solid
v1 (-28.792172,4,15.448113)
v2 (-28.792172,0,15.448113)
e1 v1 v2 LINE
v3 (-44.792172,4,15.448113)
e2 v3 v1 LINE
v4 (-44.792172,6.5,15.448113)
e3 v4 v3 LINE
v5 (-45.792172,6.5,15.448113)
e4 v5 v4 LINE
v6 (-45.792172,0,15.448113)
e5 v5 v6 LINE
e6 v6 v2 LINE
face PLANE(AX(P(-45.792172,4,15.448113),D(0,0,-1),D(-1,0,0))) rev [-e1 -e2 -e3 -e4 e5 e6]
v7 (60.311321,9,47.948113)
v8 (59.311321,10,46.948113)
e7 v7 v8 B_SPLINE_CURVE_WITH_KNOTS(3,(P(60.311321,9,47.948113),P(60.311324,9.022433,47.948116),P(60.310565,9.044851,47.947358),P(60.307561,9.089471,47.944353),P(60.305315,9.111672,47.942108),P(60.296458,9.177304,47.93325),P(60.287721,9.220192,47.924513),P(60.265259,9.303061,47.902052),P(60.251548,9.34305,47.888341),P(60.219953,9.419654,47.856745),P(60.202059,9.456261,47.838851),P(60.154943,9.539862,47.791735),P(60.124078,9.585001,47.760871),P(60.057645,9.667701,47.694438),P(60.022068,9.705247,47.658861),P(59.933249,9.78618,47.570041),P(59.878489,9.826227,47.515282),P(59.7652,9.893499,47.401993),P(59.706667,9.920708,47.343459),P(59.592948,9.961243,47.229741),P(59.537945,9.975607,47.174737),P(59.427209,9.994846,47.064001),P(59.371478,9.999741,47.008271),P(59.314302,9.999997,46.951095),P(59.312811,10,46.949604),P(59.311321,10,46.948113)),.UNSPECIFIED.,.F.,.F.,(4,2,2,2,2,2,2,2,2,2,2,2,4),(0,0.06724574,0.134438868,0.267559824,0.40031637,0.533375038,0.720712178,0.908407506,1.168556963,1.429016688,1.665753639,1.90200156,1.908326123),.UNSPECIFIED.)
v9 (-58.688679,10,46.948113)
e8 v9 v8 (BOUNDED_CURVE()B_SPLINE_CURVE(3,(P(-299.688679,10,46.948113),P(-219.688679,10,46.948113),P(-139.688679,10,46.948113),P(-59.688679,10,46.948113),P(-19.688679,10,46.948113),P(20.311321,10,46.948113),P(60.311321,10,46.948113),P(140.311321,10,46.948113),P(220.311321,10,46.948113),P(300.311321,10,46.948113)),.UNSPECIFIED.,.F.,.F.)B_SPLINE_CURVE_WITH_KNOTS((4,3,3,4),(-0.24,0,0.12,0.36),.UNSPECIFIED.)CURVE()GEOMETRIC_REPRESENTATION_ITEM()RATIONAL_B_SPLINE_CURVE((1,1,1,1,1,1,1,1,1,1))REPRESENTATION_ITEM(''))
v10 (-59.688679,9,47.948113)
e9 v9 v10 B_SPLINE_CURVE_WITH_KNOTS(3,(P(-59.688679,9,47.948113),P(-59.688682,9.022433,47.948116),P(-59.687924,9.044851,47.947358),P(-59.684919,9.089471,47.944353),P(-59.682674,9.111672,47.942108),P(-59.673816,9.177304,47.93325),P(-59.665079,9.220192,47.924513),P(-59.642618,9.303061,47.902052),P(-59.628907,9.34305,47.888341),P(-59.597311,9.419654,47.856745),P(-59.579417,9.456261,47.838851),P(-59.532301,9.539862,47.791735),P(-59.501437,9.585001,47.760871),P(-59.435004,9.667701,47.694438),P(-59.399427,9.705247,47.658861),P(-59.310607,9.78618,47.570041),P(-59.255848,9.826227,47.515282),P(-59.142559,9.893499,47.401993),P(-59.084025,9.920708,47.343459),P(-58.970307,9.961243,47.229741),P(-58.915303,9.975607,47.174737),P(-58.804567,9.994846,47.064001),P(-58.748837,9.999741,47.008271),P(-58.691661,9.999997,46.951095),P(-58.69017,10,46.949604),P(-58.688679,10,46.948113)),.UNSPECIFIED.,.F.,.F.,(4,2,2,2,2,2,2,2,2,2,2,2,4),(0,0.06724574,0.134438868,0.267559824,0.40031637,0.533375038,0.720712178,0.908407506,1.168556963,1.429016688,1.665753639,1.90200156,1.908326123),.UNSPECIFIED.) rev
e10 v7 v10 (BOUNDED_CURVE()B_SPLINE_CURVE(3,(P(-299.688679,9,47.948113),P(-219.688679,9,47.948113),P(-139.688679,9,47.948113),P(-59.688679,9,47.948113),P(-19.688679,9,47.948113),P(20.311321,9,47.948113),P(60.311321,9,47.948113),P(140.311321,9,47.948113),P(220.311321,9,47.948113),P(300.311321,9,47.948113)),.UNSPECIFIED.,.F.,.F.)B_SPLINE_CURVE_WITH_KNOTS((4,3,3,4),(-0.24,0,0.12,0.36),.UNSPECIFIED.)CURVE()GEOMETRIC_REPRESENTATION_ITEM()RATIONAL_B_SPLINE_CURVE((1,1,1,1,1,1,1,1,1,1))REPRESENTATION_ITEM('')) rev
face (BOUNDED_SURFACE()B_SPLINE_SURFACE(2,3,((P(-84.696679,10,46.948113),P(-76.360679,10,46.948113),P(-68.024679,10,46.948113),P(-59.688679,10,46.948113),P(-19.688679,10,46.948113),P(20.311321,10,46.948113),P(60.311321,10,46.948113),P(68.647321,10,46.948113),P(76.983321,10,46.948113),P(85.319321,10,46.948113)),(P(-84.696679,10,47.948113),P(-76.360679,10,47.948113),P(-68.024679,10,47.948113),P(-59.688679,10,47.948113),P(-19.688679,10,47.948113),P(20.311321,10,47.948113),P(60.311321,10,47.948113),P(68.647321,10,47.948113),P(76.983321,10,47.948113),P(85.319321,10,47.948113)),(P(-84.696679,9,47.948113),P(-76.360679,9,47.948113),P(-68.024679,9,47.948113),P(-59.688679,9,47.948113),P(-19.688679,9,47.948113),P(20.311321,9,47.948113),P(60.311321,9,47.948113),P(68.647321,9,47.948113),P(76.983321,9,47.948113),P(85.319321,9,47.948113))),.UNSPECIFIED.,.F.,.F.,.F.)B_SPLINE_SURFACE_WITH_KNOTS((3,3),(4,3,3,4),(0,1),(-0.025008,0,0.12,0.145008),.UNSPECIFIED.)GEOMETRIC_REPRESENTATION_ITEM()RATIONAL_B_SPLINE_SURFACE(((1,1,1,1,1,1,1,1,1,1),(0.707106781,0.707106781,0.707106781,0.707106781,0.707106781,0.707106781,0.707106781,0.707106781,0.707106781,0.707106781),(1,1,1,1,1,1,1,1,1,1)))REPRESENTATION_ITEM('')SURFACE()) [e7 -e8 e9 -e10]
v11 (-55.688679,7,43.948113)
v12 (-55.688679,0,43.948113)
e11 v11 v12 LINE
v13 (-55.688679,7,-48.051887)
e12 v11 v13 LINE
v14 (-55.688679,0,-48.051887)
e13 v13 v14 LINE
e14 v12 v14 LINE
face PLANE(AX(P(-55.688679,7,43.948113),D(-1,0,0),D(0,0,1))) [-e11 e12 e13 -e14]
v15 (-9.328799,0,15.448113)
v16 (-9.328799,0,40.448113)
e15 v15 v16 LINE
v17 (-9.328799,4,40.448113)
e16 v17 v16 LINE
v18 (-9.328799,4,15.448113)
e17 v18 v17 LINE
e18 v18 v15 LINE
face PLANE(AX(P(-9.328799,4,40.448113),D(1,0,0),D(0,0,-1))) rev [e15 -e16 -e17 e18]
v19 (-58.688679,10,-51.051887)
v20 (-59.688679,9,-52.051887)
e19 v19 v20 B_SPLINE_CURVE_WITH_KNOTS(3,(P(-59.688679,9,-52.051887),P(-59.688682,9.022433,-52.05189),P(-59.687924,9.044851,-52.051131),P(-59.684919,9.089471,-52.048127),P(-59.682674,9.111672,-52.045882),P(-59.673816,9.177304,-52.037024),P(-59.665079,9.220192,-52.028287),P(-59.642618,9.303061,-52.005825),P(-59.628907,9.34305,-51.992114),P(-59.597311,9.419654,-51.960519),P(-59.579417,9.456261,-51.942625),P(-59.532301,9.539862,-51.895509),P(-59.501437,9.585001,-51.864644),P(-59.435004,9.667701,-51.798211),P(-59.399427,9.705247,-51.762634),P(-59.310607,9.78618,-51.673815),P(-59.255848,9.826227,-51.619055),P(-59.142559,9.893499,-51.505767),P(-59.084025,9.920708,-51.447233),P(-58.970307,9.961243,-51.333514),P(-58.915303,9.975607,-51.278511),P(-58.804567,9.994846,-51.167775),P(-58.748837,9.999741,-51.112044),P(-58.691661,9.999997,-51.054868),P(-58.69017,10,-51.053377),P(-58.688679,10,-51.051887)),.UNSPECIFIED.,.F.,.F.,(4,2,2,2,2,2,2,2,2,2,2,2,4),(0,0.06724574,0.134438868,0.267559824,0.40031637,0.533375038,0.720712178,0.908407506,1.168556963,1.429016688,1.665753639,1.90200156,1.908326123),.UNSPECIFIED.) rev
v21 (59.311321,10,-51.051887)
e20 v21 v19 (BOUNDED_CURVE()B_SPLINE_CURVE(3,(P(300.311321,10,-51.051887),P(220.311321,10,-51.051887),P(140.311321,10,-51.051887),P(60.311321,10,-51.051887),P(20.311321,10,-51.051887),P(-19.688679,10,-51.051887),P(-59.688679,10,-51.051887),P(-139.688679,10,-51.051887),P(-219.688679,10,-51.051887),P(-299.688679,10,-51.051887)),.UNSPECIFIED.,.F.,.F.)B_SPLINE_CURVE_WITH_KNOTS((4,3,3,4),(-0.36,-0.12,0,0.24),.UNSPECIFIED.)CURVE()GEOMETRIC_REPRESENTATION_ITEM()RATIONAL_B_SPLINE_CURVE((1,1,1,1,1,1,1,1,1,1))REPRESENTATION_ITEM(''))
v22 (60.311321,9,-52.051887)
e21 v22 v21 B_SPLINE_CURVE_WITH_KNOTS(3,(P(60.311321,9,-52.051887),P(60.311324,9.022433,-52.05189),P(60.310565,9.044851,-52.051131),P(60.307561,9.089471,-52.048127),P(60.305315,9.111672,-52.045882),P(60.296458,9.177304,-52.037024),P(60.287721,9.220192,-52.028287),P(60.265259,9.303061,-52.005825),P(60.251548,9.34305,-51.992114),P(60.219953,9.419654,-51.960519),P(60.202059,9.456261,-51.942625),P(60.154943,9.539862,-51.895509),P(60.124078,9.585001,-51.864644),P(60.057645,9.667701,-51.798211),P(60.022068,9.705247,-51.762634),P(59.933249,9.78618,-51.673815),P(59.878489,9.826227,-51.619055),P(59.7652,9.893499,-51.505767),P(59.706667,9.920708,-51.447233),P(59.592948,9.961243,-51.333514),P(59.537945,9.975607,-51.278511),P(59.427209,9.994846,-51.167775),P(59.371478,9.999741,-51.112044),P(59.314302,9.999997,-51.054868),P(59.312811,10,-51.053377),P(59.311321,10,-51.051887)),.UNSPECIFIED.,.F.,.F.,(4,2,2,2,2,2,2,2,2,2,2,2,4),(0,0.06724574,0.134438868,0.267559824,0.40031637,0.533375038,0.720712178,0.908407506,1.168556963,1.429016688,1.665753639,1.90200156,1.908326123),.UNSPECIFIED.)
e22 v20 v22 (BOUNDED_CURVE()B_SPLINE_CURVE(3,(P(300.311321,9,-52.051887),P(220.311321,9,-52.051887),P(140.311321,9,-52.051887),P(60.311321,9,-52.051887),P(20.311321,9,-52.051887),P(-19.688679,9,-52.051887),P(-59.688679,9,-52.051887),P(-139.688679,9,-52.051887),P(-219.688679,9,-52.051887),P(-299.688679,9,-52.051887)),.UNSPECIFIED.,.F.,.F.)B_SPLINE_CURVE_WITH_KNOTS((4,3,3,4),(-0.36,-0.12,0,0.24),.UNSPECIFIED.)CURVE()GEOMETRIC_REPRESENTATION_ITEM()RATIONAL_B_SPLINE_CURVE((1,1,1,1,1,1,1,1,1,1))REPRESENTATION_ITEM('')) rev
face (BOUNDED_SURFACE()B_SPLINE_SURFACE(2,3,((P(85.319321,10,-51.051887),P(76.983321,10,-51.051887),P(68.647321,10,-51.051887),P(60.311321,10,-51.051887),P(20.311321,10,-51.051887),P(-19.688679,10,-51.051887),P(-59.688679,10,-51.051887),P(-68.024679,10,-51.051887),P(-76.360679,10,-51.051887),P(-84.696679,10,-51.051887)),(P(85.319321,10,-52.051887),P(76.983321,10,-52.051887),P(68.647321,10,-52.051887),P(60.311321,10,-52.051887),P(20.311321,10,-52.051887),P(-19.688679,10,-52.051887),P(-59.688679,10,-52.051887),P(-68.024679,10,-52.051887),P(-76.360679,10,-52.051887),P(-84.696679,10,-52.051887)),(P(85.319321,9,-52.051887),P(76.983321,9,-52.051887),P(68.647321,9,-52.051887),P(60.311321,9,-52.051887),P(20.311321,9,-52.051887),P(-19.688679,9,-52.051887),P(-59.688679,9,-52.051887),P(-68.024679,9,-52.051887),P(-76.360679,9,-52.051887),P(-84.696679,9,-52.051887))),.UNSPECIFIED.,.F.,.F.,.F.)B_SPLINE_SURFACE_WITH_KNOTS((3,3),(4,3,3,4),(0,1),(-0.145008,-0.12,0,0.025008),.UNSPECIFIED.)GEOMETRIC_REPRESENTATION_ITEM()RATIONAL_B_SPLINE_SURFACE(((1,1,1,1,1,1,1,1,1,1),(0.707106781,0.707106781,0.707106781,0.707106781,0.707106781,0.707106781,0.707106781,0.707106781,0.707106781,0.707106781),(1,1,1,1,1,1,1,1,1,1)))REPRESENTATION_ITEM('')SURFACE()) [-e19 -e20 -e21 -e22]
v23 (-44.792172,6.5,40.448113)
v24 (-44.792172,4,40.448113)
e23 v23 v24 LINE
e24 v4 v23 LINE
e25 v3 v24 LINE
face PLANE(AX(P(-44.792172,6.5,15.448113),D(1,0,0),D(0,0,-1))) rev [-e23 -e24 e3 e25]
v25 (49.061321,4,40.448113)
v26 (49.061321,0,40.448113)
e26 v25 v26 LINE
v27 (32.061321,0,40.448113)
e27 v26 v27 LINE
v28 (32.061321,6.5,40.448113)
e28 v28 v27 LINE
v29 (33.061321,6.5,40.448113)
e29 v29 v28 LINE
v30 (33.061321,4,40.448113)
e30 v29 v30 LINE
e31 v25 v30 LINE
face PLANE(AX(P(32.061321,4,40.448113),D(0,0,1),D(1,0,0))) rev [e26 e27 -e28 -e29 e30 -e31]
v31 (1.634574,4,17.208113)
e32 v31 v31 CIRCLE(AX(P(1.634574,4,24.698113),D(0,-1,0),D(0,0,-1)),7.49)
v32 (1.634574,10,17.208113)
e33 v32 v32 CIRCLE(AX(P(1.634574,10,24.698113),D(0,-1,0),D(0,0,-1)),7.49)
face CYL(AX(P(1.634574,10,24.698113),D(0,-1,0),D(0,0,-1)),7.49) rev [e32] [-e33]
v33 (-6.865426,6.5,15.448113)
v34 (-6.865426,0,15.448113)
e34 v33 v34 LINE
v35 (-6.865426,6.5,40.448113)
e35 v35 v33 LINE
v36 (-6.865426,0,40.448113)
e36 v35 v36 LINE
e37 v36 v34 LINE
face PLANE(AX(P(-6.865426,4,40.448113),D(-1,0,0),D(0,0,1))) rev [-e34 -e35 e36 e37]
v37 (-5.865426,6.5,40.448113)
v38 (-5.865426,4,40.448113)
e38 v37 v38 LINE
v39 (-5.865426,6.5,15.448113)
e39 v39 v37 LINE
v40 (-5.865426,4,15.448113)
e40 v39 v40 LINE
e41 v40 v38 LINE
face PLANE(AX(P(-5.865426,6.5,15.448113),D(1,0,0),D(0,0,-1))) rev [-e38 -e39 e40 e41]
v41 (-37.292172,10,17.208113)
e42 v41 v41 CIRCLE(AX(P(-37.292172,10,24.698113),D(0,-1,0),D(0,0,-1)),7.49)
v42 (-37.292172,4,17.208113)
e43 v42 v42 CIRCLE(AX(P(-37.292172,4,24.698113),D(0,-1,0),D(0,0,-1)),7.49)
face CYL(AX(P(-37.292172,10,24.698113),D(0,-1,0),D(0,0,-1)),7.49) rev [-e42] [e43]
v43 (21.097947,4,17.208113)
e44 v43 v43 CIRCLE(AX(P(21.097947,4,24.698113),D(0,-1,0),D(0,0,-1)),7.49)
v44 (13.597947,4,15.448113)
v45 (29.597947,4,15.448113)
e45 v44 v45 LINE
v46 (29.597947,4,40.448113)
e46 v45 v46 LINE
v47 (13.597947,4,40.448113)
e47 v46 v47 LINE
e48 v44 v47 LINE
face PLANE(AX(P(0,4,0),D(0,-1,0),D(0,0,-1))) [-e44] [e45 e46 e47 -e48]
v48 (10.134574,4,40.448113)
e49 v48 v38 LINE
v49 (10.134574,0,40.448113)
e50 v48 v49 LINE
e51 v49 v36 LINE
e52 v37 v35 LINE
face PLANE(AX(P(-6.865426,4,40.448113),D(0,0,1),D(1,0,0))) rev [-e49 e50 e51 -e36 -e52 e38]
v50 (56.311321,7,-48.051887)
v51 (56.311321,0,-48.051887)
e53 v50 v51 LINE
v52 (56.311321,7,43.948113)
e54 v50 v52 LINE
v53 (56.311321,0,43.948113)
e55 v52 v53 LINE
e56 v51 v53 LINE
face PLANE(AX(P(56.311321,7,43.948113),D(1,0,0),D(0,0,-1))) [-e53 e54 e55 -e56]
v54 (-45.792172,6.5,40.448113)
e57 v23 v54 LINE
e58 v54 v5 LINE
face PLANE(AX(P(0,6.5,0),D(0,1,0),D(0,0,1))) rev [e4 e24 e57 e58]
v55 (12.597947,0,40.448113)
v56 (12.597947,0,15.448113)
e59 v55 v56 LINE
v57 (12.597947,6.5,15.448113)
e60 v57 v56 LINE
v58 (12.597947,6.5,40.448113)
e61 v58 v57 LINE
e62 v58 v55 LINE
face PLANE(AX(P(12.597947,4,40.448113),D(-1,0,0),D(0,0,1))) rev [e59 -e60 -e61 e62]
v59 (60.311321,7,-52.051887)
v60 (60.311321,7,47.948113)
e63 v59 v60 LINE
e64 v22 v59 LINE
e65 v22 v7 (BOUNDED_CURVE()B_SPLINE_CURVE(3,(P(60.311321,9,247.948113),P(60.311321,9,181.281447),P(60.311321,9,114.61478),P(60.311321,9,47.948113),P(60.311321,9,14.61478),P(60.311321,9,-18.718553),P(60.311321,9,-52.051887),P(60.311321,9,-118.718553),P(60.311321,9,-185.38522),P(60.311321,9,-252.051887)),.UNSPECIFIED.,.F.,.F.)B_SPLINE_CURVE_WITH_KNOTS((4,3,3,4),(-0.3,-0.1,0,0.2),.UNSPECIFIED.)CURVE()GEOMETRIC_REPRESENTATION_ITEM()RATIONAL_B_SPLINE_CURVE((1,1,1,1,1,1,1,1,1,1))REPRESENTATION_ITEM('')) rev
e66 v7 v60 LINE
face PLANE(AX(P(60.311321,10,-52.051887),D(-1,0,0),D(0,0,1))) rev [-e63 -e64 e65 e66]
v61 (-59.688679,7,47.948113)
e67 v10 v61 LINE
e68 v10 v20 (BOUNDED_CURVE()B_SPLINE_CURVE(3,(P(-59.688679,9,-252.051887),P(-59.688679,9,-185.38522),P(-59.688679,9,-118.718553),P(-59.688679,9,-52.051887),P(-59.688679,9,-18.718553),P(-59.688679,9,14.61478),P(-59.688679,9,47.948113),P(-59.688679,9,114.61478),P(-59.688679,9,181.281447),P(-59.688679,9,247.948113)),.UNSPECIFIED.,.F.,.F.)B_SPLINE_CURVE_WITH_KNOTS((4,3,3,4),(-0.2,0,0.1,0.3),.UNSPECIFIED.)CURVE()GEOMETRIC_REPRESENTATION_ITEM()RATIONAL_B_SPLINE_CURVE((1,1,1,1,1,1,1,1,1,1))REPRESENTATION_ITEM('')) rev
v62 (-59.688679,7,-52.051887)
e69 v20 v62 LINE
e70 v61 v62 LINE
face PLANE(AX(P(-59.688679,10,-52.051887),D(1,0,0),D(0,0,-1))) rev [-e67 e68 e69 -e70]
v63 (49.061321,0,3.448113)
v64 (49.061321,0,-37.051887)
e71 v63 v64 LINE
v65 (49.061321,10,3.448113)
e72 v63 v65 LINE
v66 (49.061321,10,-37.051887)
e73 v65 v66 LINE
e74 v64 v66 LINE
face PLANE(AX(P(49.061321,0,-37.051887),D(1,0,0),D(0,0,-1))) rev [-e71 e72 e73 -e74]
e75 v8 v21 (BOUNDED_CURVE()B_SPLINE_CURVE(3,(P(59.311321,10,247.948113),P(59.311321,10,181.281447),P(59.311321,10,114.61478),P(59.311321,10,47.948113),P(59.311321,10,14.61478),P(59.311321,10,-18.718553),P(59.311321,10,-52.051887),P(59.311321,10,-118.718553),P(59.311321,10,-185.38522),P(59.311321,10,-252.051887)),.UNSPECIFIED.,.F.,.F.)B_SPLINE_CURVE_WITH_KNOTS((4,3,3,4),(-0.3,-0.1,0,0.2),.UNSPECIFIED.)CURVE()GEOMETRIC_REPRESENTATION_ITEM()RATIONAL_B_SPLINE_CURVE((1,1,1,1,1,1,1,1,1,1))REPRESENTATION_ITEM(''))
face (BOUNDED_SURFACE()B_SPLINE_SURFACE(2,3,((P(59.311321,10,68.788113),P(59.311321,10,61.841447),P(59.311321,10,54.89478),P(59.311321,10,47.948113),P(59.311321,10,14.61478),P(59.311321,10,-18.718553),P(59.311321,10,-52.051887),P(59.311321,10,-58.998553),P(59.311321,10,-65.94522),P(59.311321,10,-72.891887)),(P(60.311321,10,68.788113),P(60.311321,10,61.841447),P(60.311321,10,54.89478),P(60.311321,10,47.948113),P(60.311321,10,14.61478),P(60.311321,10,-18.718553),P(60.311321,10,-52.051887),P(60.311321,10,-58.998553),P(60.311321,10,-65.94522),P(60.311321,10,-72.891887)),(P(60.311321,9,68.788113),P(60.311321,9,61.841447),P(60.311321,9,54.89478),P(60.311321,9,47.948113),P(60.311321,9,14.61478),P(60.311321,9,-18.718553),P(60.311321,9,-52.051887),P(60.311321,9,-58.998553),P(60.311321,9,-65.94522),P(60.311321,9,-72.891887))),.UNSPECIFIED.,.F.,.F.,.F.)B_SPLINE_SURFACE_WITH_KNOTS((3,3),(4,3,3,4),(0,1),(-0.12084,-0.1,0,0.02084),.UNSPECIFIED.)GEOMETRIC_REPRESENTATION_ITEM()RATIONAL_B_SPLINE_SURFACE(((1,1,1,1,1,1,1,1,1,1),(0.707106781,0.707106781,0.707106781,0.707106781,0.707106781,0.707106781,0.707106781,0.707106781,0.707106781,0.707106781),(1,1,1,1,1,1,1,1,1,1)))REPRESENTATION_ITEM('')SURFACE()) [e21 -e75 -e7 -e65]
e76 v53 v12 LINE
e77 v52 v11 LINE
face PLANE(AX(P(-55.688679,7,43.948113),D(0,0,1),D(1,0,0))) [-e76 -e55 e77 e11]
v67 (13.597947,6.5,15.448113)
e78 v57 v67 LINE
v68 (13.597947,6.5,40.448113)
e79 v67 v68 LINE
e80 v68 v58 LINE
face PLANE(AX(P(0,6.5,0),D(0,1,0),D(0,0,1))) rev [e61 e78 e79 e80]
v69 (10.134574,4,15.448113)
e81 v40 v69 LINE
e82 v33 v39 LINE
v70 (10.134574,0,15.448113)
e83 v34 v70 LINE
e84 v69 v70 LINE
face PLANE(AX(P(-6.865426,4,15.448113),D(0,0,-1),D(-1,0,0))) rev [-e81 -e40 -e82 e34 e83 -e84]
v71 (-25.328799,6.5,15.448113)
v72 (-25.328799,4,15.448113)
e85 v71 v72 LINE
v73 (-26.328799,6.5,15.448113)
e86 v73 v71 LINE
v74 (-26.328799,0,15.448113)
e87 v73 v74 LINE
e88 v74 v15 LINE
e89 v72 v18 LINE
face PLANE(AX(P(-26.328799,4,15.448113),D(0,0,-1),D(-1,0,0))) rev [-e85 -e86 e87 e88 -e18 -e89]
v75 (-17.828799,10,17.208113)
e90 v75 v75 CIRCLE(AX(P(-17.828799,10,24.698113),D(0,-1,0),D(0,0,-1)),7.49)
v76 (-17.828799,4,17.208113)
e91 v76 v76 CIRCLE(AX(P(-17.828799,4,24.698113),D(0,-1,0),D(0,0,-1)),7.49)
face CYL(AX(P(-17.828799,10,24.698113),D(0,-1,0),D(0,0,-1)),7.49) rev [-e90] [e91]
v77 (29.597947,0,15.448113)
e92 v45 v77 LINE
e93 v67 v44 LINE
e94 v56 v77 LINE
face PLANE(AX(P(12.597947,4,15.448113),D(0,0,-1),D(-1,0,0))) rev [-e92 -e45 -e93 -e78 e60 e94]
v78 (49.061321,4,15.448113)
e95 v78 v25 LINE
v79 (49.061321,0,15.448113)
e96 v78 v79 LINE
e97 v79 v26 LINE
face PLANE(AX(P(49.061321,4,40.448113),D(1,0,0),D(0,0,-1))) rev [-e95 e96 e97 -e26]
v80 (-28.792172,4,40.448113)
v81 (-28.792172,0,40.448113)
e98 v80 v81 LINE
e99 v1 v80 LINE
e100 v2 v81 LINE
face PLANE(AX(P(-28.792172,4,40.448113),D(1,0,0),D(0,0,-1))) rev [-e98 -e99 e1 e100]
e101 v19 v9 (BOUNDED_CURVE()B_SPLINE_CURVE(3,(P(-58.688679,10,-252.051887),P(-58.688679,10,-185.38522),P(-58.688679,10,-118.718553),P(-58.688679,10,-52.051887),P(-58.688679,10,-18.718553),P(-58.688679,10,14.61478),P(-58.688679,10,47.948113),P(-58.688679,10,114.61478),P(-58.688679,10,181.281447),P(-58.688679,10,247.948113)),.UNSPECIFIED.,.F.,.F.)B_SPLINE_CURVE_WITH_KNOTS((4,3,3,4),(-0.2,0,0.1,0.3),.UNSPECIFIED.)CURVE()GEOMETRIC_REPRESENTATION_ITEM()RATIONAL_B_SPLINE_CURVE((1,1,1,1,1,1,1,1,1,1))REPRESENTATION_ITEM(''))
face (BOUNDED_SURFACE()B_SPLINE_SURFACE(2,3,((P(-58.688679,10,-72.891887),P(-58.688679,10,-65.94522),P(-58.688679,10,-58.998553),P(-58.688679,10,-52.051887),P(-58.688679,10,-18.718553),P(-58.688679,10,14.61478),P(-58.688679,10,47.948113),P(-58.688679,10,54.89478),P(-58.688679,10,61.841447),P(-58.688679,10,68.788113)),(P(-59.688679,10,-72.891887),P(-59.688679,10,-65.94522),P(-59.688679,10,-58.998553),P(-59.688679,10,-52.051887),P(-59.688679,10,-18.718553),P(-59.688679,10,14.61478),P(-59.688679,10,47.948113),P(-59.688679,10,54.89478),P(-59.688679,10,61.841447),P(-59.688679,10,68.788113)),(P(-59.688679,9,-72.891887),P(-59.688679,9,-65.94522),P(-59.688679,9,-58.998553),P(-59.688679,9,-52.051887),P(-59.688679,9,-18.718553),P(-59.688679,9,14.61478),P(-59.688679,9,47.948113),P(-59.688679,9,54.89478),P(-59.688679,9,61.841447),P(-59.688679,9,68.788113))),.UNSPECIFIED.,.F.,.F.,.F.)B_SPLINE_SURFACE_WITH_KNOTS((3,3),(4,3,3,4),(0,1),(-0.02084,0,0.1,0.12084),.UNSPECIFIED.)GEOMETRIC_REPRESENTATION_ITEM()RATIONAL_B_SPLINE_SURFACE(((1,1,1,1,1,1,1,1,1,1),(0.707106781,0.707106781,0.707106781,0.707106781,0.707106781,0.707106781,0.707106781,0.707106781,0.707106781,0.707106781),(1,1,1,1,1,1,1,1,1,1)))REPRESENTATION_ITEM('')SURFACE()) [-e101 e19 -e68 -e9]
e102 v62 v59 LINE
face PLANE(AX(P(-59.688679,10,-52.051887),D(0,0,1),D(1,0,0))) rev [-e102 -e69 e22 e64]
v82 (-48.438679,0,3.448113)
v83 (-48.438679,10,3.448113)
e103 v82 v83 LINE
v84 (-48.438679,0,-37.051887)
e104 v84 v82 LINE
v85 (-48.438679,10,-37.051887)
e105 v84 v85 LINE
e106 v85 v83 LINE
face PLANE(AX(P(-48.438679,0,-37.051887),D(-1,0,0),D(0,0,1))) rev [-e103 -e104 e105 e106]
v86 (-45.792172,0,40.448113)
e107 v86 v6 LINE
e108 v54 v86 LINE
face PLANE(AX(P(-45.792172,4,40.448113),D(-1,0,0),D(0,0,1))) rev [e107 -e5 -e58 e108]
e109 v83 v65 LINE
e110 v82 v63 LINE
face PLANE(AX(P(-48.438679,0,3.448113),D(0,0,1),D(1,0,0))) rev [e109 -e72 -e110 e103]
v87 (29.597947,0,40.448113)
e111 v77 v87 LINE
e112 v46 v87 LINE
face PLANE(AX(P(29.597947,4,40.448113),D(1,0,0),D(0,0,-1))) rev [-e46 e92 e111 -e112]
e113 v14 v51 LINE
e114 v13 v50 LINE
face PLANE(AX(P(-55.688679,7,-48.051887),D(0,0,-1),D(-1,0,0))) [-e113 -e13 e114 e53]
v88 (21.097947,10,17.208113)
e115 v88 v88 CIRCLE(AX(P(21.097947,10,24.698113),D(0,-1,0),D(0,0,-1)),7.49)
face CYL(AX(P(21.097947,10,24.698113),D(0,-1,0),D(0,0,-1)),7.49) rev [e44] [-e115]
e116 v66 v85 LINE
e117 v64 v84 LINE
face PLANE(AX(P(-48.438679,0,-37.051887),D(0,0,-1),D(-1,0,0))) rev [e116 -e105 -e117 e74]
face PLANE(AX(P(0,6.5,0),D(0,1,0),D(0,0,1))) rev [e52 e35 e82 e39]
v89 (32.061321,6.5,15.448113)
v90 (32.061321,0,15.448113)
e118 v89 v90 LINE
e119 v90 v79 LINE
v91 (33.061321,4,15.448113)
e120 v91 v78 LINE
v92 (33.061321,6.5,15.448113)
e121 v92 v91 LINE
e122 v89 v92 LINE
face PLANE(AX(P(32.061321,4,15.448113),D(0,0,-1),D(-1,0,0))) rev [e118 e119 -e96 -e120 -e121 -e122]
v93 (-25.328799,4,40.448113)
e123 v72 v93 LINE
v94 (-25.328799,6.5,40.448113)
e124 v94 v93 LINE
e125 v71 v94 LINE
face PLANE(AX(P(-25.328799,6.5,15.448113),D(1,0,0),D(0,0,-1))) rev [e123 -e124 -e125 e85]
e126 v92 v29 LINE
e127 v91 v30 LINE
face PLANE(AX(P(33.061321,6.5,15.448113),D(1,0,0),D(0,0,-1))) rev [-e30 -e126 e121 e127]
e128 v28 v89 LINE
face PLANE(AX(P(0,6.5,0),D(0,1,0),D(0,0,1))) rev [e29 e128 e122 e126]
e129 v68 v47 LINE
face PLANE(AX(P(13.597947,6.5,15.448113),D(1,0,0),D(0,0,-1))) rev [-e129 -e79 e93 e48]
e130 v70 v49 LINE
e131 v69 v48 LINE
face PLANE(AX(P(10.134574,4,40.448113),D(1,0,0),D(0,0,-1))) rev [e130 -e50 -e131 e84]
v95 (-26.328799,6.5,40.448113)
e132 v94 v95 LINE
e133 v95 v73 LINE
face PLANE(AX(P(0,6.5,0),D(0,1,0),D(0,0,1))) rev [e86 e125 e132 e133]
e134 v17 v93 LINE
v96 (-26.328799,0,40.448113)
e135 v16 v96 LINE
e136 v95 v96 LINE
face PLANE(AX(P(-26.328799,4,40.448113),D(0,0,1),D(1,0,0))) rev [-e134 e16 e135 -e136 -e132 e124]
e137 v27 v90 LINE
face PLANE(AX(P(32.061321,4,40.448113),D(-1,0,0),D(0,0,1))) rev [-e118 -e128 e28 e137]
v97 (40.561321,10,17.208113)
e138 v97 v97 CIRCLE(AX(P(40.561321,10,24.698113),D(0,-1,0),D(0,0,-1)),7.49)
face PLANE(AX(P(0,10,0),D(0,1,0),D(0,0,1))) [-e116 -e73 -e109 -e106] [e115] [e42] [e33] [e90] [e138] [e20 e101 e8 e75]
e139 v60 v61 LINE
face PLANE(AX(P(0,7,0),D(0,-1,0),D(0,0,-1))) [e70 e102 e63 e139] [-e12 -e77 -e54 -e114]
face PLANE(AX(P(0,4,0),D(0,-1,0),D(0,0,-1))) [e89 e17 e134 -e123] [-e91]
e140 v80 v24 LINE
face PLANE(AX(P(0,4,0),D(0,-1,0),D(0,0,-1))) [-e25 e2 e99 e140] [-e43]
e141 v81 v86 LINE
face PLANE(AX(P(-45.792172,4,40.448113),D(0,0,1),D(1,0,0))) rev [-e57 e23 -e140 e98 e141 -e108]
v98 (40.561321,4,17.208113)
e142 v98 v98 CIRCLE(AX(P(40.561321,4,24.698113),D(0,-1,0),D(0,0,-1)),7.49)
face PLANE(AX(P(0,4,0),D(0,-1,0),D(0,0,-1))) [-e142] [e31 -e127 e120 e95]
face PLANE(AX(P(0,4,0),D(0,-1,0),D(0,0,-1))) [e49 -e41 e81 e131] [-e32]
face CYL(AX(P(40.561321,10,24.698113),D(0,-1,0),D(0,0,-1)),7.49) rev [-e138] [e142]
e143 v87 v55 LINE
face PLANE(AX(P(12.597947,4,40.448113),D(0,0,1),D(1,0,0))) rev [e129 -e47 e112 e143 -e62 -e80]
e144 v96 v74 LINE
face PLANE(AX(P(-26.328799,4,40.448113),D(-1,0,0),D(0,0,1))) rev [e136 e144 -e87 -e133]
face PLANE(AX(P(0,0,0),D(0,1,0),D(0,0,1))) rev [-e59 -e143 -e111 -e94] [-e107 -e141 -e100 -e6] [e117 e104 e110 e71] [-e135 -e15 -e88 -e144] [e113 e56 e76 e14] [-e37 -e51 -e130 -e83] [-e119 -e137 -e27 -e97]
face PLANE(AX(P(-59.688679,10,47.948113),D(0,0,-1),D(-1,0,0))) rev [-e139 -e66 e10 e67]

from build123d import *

# Parameters (mm, degrees)
SKETCH1_W           = 120
SKETCH1_H           = 100
BOSS_EXTRUDE1_DEPTH = 10
SKETCH2_W           = 97.5
SKETCH2_H           = 40.5
CUT_EXTRUDE1_DEPTH  = 10
SKETCH3_W           = 120
SKETCH3_H           = 100
SKETCH3_W_2         = 112
SKETCH3_H_2         = 92
CUT_EXTRUDE3_DEPTH  = 7
SKETCH4_W           = 17
SKETCH4_H           = 25
CUT_EXTRUDE4_DEPTH  = 4
SKETCH5_W           = 1
SKETCH5_H           = 25
CUT_EXTRUDE6_DEPTH  = 2.5
SKETCH6_R           = 7.49
CUT_EXTRUDE12_DEPTH = 80.892767694
VARFILLET1_R        = 1


with BuildPart() as part:
    # Sketch1 → Boss-Extrude1 (new body)
    with BuildSketch(Plane(origin=(0, 0, 0), x_dir=(1, 0, 0), z_dir=(0, 1, 0))):
        with Locations((0.311320755, 2.051886792)):
            Rectangle(SKETCH1_W, SKETCH1_H)
    extrude(amount=BOSS_EXTRUDE1_DEPTH)

    # Sketch2 → Cut-Extrude1 (cut)
    with BuildSketch(Plane(origin=(0, 10, 0), x_dir=(1, 0, 0), z_dir=(0, 1, 0))):
        with Locations((0.311320755, 16.801886792)):
            Rectangle(SKETCH2_W, SKETCH2_H)
    extrude(amount=-CUT_EXTRUDE1_DEPTH, mode=Mode.SUBTRACT)

    # Sketch3 → Cut-Extrude3 (cut)
    with BuildSketch(Plane.XZ):
        with Locations((0.311320755, -2.051886792)):
            Rectangle(SKETCH3_W, SKETCH3_H)
        with Locations((0.311320755, -2.051886792)):
            Rectangle(SKETCH3_W_2, SKETCH3_H_2, mode=Mode.SUBTRACT)
    extrude(amount=-CUT_EXTRUDE3_DEPTH, mode=Mode.SUBTRACT)

    # Sketch4 → Cut-Extrude4 (cut)
    with BuildSketch(Plane.XZ):
        with Locations((-37.292172289, 27.948113208)):
            Rectangle(SKETCH4_W, SKETCH4_H)
        with Locations((-17.828799028, 27.948113208)):
            Rectangle(SKETCH4_W, SKETCH4_H)
        with Locations((1.634574233, 27.948113208)):
            Rectangle(SKETCH4_W, SKETCH4_H)
        with Locations((21.097947494, 27.948113208)):
            Rectangle(SKETCH4_W, SKETCH4_H)
        with Locations((40.561320755, 27.948113208)):
            Rectangle(SKETCH4_W, SKETCH4_H)
    extrude(amount=-CUT_EXTRUDE4_DEPTH, mode=Mode.SUBTRACT)

    # Sketch5 → Cut-Extrude6 (cut)
    with BuildSketch(Plane.XZ.offset(-4)):
        with Locations((32.561320755, 27.948113208)):
            Rectangle(SKETCH5_W, SKETCH5_H)
        with Locations((13.097947494, 27.948113208)):
            Rectangle(SKETCH5_W, SKETCH5_H)
        with Locations((-6.365425767, 27.948113208)):
            Rectangle(SKETCH5_W, SKETCH5_H)
        with Locations((-25.828799028, 27.948113208)):
            Rectangle(SKETCH5_W, SKETCH5_H)
        with Locations((-45.292172289, 27.948113208)):
            Rectangle(SKETCH5_W, SKETCH5_H)
    extrude(amount=-CUT_EXTRUDE6_DEPTH, mode=Mode.SUBTRACT)

    # Sketch6 → Cut-Extrude12 (cut, through all)
    with BuildSketch(Plane.XZ.offset(-4)):
        with Locations((40.561320755, 24.698113208)):
            Circle(SKETCH6_R)
        with Locations((21.097947494, 24.698113208)):
            Circle(SKETCH6_R)
        with Locations((1.634574233, 24.698113208)):
            Circle(SKETCH6_R)
        with Locations((-17.828799028, 24.698113208)):
            Circle(SKETCH6_R)
        with Locations((-37.292172289, 24.698113208)):
            Circle(SKETCH6_R)
    extrude(amount=-CUT_EXTRUDE12_DEPTH, mode=Mode.SUBTRACT)

    # VarFillet1
    varfillet1_edges = [part.edges().sort_by_distance(p)[0] for p in [
        (0.311320755, 10, 47.948113208),
        (60.311320755, 10, -2.051886792),
        (0.311320755, 10, -52.051886792),
        (-59.688679245, 10, -2.051886792),
    ]]
    fillet(varfillet1_edges, radius=VARFILLET1_R)


solid = part.part
